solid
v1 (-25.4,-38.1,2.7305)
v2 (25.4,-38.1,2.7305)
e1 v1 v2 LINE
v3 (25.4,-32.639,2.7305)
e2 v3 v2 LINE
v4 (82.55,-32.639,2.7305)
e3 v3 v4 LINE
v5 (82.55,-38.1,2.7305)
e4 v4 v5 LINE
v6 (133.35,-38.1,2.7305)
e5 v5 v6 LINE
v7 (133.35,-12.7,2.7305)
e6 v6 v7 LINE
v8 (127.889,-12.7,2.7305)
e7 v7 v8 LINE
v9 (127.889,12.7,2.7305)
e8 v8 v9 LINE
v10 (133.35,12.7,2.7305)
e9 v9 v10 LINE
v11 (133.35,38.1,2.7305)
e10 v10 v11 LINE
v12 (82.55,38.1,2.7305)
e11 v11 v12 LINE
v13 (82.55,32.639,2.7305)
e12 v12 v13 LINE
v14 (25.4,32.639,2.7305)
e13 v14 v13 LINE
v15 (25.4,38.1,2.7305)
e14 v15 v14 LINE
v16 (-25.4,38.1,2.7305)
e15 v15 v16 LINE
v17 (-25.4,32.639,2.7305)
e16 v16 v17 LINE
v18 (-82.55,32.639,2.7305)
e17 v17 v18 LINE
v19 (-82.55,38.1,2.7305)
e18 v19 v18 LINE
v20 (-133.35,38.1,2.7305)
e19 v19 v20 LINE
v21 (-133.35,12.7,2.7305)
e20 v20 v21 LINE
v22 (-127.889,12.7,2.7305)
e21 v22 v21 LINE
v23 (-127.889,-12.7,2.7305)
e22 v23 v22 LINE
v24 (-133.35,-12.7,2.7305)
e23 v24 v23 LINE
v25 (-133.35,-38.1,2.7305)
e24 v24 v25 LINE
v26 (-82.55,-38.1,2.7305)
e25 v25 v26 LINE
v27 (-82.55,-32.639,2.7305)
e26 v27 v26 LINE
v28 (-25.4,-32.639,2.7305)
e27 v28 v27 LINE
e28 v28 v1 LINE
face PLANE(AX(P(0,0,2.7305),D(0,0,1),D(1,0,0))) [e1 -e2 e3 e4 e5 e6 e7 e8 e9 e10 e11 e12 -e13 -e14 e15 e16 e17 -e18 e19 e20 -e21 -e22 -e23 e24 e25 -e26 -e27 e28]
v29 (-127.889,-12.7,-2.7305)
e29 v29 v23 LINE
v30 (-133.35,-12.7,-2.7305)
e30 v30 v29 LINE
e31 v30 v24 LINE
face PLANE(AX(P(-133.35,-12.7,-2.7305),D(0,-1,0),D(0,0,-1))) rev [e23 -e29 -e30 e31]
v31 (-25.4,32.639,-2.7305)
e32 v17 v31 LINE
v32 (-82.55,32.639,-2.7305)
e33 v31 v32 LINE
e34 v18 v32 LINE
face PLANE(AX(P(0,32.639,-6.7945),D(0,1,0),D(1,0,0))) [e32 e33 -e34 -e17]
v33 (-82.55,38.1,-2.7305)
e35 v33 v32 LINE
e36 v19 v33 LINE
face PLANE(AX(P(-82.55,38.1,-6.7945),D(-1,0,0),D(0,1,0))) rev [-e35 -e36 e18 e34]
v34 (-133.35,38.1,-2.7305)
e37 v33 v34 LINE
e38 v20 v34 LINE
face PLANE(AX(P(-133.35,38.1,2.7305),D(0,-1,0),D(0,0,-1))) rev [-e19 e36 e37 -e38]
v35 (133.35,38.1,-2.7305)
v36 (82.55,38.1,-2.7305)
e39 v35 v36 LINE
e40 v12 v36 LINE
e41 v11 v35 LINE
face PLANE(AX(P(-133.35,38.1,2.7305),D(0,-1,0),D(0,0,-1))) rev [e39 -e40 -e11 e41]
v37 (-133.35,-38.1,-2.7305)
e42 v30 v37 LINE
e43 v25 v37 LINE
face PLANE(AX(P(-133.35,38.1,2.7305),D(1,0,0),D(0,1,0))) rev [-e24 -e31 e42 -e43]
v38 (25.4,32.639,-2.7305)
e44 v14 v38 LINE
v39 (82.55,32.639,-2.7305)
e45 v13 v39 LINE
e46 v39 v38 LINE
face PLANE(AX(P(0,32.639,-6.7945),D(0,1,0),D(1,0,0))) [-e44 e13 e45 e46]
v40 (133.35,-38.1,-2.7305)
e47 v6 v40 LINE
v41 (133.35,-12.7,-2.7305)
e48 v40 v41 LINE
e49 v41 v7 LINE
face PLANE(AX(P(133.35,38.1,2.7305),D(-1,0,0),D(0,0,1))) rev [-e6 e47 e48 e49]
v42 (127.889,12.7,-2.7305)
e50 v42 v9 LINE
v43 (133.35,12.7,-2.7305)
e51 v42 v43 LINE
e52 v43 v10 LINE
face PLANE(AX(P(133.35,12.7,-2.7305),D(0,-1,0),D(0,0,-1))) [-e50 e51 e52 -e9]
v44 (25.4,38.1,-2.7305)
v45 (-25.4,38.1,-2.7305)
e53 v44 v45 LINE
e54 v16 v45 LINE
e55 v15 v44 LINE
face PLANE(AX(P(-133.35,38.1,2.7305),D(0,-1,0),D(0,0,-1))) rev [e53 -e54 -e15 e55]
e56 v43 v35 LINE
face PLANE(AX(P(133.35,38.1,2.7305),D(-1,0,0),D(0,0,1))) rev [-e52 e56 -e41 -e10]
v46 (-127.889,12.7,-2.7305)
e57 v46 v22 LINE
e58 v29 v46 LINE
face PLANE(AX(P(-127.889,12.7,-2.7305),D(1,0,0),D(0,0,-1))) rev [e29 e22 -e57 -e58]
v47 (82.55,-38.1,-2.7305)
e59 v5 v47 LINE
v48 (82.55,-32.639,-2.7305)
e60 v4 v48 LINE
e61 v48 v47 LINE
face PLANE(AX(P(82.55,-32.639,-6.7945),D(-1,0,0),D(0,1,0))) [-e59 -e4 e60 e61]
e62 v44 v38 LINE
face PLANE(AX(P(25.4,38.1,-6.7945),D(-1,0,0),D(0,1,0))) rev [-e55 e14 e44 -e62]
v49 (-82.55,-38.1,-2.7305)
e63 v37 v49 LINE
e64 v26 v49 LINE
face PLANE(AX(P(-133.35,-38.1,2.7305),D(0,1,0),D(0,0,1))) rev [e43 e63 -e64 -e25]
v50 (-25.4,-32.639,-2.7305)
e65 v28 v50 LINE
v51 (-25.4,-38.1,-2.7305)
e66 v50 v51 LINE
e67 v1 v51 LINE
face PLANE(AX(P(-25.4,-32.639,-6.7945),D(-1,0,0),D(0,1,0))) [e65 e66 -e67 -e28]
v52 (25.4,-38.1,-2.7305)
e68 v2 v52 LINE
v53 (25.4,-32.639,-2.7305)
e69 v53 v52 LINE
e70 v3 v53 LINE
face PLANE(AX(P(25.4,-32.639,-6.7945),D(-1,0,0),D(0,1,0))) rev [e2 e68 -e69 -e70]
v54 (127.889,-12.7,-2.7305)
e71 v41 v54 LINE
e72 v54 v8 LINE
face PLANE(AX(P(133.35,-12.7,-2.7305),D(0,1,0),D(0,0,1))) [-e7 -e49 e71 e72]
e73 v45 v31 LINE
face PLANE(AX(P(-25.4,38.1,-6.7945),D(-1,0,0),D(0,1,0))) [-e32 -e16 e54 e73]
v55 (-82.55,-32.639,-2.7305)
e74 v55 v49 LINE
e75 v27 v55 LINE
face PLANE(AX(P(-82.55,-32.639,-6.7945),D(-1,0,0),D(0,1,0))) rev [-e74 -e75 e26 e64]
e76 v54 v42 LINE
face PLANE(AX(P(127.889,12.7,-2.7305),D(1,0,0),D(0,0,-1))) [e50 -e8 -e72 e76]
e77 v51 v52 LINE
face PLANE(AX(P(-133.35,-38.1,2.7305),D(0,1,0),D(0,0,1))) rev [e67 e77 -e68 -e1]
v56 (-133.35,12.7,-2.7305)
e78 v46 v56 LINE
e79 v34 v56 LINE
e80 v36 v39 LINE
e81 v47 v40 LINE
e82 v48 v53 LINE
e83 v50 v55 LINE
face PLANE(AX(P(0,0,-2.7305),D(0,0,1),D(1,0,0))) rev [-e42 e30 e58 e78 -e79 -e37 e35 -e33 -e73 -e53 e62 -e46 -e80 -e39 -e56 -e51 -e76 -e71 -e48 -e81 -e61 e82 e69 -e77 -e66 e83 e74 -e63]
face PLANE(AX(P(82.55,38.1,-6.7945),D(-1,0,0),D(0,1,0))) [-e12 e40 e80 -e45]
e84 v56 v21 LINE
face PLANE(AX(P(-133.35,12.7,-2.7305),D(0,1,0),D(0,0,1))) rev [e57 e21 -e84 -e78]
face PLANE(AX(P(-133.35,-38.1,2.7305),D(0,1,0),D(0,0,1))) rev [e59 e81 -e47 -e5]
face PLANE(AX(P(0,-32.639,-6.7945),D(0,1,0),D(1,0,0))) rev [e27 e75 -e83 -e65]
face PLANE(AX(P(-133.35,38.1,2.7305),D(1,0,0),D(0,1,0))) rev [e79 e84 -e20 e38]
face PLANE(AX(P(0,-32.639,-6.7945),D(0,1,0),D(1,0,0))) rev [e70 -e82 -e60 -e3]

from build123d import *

# Parameters (mm, degrees)
SKETCH1_W           = 266.7
SKETCH1_H           = 76.2
BOSS_EXTRUDE1_DEPTH = 2.7305
CAVITY1_START       = -38.1
CAVITY1_OUTLINE_W   = 57.15
CAVITY1_OUTLINE_H   = 5.461
CAVITY1_DEPTH       = 5.461
CAVITY1_START_2     = 32.639
CAVITY1_2_OUTLINE_W = 57.15
CAVITY1_2_OUTLINE_H = 5.461
CAVITY1_2_DEPTH     = 5.461
SKETCH2_W           = 5.461
SKETCH2_H           = 25.4
CUT_EXTRUDE1_DEPTH  = 139.793569811


# Read off the part's stored shape, not the designer's step: Cavity1
with BuildPart() as part:
    # Sketch1 → Boss-Extrude1 (new, symmetric)
    with BuildSketch(Plane.XY):
        Rectangle(SKETCH1_W, SKETCH1_H)
    extrude(amount=BOSS_EXTRUDE1_DEPTH, both=True)

    # Cavity1 outline → Cavity1 (cut)
    with BuildSketch(Plane(origin=(0, 0, 0), x_dir=(1, 0, 0), z_dir=(0, 1, 0)).offset(CAVITY1_START)):
        with Locations((-53.975, 0)):
            Rectangle(CAVITY1_OUTLINE_W, CAVITY1_OUTLINE_H)
        with Locations((53.975, 0)):
            Rectangle(CAVITY1_OUTLINE_W, CAVITY1_OUTLINE_H)
    extrude(amount=CAVITY1_DEPTH, mode=Mode.SUBTRACT)

    # Cavity1 2 outline → Cavity1 2 (cut)
    with BuildSketch(Plane(origin=(0, 0, 0), x_dir=(1, 0, 0), z_dir=(0, 1, 0)).offset(CAVITY1_START_2)):
        with Locations((-53.975, 0)):
            Rectangle(CAVITY1_2_OUTLINE_W, CAVITY1_2_OUTLINE_H)
        with Locations((53.975, 0)):
            Rectangle(CAVITY1_2_OUTLINE_W, CAVITY1_2_OUTLINE_H)
    extrude(amount=CAVITY1_2_DEPTH, mode=Mode.SUBTRACT)

    # Sketch2 → Cut-Extrude1 (cut, through all)
    with BuildSketch(Plane.XY.offset(2.7305)):
        with Locations((-130.6195, 0)):
            Rectangle(SKETCH2_W, SKETCH2_H)
    cut_extrude1 = extrude(amount=-CUT_EXTRUDE1_DEPTH, mode=Mode.SUBTRACT)

    # Mirror1: Cut-Extrude1 across plane
    add(cut_extrude1.mirror(Plane(origin=(0, 0, 0), x_dir=(0, 0, 1), z_dir=(1, 0, 0))), mode=Mode.SUBTRACT)


solid = part.part
